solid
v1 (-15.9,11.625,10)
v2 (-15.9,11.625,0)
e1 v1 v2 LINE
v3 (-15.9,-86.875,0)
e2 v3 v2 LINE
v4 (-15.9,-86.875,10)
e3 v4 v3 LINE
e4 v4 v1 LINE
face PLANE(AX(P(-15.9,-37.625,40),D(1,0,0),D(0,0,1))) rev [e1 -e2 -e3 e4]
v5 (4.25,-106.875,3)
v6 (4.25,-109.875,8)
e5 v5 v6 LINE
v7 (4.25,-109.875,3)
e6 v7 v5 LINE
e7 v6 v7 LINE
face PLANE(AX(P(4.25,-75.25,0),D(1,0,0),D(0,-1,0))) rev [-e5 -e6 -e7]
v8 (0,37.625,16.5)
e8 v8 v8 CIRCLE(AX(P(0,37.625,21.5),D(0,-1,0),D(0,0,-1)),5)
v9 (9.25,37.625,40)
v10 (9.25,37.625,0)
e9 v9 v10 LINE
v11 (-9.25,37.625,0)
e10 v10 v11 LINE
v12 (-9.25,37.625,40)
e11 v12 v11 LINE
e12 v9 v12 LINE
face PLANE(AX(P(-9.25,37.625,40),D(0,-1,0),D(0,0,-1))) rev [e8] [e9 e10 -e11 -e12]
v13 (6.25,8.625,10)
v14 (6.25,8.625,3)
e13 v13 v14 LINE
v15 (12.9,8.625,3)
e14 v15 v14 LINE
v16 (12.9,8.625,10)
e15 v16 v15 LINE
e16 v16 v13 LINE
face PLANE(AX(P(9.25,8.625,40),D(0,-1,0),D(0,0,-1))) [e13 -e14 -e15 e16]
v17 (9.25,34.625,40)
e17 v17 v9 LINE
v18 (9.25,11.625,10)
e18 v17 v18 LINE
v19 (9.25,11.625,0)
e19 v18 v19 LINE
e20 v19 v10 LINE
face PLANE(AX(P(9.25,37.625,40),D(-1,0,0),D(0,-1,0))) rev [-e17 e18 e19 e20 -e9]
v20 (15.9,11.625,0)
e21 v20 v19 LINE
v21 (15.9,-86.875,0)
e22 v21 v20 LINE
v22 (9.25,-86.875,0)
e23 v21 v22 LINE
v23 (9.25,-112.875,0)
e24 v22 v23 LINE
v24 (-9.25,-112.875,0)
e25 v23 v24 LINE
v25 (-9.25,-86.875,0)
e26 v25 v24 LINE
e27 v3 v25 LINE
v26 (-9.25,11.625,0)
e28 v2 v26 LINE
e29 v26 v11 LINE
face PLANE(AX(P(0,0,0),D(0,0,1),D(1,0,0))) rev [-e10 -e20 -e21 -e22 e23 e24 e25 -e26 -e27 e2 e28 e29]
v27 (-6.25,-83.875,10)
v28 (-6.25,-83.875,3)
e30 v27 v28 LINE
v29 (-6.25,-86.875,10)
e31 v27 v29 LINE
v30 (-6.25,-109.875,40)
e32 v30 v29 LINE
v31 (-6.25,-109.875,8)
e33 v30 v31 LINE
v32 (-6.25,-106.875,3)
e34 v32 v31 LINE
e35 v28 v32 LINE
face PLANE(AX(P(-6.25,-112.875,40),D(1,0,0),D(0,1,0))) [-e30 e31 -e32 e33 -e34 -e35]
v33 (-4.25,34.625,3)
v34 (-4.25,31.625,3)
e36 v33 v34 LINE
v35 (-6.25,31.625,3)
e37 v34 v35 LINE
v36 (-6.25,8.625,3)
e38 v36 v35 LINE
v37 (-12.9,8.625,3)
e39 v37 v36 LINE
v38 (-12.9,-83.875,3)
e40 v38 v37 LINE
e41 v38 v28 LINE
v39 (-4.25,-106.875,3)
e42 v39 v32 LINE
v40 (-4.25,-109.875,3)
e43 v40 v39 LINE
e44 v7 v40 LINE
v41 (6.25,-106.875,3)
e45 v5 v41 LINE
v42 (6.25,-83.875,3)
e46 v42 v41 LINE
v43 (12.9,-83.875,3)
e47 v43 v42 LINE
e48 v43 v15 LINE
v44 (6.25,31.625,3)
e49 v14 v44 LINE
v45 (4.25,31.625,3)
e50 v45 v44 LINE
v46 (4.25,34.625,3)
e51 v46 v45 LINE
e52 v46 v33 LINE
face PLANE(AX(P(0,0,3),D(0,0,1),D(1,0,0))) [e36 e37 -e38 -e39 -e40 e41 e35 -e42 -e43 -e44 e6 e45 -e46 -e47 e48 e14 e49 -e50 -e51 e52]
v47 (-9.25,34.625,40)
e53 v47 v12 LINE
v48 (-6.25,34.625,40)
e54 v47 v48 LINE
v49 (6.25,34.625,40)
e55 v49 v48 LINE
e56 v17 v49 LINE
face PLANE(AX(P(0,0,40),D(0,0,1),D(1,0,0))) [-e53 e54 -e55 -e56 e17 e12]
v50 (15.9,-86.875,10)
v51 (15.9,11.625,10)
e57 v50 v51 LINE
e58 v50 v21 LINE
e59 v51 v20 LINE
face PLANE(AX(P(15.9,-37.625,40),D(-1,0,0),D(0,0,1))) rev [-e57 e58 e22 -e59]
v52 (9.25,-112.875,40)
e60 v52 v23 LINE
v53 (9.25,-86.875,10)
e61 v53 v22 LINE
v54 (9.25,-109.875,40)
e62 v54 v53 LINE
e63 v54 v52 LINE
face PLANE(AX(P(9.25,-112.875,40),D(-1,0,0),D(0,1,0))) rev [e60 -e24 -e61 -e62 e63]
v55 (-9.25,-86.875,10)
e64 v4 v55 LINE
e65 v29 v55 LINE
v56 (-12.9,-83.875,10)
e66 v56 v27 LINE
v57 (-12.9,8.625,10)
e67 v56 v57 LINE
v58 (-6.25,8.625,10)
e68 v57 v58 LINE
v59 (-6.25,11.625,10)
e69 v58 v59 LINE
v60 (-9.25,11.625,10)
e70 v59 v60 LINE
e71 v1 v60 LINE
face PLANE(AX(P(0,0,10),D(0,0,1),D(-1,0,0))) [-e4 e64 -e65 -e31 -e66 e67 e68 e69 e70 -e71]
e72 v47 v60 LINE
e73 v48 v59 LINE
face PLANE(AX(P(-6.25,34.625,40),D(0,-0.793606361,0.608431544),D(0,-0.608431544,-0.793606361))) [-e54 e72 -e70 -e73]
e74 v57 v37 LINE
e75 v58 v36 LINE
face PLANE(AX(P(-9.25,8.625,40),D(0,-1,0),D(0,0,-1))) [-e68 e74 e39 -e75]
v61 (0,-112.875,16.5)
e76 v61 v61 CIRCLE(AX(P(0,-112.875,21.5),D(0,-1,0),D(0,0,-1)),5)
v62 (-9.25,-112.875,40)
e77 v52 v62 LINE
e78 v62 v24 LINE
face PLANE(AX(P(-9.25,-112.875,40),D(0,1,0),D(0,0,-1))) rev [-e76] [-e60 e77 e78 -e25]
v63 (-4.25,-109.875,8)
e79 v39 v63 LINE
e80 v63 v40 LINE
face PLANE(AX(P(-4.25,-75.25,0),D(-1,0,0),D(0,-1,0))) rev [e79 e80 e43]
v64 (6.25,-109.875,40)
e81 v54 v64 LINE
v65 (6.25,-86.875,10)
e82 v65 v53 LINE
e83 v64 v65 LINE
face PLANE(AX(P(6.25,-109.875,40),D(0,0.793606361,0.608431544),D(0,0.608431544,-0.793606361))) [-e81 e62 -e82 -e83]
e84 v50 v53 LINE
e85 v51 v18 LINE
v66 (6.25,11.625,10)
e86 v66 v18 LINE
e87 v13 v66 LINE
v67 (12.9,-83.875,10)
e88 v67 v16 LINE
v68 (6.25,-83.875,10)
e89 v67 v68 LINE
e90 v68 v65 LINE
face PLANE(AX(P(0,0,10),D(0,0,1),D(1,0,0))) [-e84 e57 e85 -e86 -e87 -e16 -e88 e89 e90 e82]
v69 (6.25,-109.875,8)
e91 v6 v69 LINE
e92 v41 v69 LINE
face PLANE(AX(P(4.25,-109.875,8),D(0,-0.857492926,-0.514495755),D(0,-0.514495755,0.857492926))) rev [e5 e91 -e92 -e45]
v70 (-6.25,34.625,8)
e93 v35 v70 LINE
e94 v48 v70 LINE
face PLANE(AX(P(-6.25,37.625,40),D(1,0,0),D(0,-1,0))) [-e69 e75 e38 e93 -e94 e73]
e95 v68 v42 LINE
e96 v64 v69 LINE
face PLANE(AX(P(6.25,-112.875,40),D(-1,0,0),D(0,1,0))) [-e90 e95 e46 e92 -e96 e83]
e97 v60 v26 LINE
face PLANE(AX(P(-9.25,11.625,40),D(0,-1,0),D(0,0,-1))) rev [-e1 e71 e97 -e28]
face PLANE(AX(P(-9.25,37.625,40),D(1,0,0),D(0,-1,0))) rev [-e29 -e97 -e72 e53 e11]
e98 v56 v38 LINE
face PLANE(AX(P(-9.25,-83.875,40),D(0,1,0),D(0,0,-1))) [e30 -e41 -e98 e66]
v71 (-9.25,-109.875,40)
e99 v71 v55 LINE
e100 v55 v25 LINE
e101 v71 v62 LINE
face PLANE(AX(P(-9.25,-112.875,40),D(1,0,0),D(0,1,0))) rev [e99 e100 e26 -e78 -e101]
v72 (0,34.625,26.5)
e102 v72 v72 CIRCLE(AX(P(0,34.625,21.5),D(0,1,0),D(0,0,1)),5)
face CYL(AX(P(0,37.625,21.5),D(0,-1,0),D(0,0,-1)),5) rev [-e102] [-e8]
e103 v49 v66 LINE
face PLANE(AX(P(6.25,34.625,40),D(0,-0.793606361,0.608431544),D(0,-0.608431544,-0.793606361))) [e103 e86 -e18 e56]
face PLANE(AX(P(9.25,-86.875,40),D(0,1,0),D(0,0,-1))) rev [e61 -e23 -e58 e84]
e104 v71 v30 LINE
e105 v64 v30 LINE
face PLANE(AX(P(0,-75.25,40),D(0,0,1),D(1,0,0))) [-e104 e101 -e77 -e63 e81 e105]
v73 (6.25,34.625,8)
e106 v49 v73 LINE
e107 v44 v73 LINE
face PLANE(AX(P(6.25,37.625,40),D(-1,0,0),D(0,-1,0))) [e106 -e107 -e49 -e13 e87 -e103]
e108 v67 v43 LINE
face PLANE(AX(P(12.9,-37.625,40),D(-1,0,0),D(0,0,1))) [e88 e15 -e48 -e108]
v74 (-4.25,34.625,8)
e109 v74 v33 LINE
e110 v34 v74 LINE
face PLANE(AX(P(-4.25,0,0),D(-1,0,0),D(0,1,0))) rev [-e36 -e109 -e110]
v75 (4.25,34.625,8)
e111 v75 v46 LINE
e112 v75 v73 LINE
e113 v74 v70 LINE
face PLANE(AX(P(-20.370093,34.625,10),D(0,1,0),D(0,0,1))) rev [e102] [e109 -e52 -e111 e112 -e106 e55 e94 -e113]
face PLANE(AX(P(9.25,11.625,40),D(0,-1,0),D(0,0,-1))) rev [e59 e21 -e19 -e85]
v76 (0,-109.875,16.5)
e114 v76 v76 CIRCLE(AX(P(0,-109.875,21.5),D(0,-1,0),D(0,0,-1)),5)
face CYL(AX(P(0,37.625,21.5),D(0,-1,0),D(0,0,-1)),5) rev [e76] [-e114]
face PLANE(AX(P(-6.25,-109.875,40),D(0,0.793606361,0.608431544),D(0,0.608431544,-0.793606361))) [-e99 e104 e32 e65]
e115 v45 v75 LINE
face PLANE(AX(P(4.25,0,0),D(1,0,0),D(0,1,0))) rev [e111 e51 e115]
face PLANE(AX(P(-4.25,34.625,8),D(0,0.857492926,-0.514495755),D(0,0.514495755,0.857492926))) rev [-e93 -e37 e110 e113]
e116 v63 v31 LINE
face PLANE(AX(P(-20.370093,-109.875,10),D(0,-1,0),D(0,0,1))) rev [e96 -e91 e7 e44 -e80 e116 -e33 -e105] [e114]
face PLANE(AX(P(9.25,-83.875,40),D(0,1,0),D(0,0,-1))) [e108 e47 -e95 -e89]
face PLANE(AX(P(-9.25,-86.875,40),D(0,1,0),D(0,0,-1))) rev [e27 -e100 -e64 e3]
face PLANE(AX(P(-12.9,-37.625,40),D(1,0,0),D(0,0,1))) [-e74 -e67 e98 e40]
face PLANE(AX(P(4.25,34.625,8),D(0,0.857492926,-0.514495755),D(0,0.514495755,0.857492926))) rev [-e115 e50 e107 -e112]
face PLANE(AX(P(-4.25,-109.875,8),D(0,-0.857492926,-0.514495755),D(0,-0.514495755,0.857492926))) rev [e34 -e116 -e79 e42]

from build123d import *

# Parameters (mm, degrees)
BOSS_EXTRUDE11_DEPTH    = 40
SKETCH17_W              = 47.22521337
SKETCH17_H              = 85.181086333
CUT_EXTRUDE6_DEPTH      = 30
SHELL3_START            = -37.625
SHELL3_OUTLINE_W        = 25.8
SHELL3_OUTLINE_H        = 7
SHELL3_DEPTH            = 46.25
SHELL3_START_2          = 8.625
SHELL3_2_OUTLINE_W      = 12.5
SHELL3_2_OUTLINE_H      = 7
SHELL3_2_DEPTH          = 26
SKETCH18_W              = 54.471727392
SKETCH18_H              = 147.372956823
CUT_EXTRUDE7_DEPTH      = 308
BOSS_EXTRUDE12_DEPTH    = 3
BOSS_EXTRUDE13_DEPTH    = 2
CUT_EXTRUDE8_DEPTH      = 154.652399916
CUT_EXTRUDE8_DEPTH_BACK = 154.652399916
SKETCH21_R              = 5


# Read off the part's stored shape, not the designer's step: Shell3
with BuildPart() as part:
    # Sketch16 → Boss-Extrude11 (new body)
    with BuildSketch(Plane.XY):
        Polygon((-15.9, -37.625), (15.9, -37.625), (15.9, 11.625), (9.25, 11.625), (9.25, 37.625), (-9.25, 37.625), (-9.25, 11.625), (-15.9, 11.625), align=None)
    extrude(amount=BOSS_EXTRUDE11_DEPTH)

    # Sketch17 → Cut-Extrude6 (cut)
    with BuildSketch(Plane.XY.offset(40)):
        with Locations((3.242513711, -7.965543167)):
            Rectangle(SKETCH17_W, SKETCH17_H)
    extrude(amount=-CUT_EXTRUDE6_DEPTH, mode=Mode.SUBTRACT)

    # Shell3 outline → Shell3 (cut)
    with BuildSketch(Plane(origin=(0, 0, 0), x_dir=(1, 0, 0), z_dir=(0, 1, 0)).offset(SHELL3_START)):
        with Locations((0, -6.5)):
            Rectangle(SHELL3_OUTLINE_W, SHELL3_OUTLINE_H)
    extrude(amount=SHELL3_DEPTH, mode=Mode.SUBTRACT)

    # Shell3 2 outline → Shell3 2 (cut)
    with BuildSketch(Plane(origin=(0, 0, 0), x_dir=(1, 0, 0), z_dir=(0, 1, 0)).offset(SHELL3_START_2)):
        with Locations((0, -6.5)):
            Rectangle(SHELL3_2_OUTLINE_W, SHELL3_2_OUTLINE_H)
    extrude(amount=SHELL3_2_DEPTH, mode=Mode.SUBTRACT)

    # Sketch18 → Cut-Extrude7 (cut)
    with BuildSketch(Plane.XY.offset(40)):
        with Locations((-27.235863696, -36.061478412)):
            Rectangle(SKETCH18_W, SKETCH18_H)
    extrude(amount=-CUT_EXTRUDE7_DEPTH, mode=Mode.SUBTRACT)

    # Sketch19 → Boss-Extrude12 (add)
    with BuildSketch(Plane(origin=(9.25, 0, 0), x_dir=(0, 0, -1), z_dir=(1, 0, 0))):
        Polygon((-40, 34.625), (-10, 11.625), (-10, 34.625), align=None)
    extrude(amount=-BOSS_EXTRUDE12_DEPTH)

    # Sketch20 → Boss-Extrude13 (add)
    with BuildSketch(Plane.ZY.offset(-6.25)):
        Polygon((3, 34.625), (8, 34.625), (3, 31.625), align=None)
    extrude(amount=BOSS_EXTRUDE13_DEPTH)

    # Mirror3: part across plane


with BuildPart() as part_1:
    add(part.part)
    add(part.part.mirror(Plane(origin=(0, 37.625, -268), x_dir=(0, 0, 1), z_dir=(1, 0, 0))))

    # Mirror4: part across plane


with BuildPart() as part_2:
    add(part_1.part)
    add(part_1.part.mirror(Plane(origin=(-15.9, -37.625, 40), x_dir=(0, 0, 1), z_dir=(0, 1, 0))))

    # Sketch21 → Cut-Extrude8 (cut, two sides: drawn at the far end of the back side and taken through both)
    with BuildSketch(Plane.XZ.offset(-34.625).offset(-CUT_EXTRUDE8_DEPTH_BACK)):
        with Locations(Location((0, 21.5, 0), (0, 0, 270))):
            Circle(SKETCH21_R)
    extrude(amount=CUT_EXTRUDE8_DEPTH + CUT_EXTRUDE8_DEPTH_BACK, mode=Mode.SUBTRACT)


solid = part_2.part
